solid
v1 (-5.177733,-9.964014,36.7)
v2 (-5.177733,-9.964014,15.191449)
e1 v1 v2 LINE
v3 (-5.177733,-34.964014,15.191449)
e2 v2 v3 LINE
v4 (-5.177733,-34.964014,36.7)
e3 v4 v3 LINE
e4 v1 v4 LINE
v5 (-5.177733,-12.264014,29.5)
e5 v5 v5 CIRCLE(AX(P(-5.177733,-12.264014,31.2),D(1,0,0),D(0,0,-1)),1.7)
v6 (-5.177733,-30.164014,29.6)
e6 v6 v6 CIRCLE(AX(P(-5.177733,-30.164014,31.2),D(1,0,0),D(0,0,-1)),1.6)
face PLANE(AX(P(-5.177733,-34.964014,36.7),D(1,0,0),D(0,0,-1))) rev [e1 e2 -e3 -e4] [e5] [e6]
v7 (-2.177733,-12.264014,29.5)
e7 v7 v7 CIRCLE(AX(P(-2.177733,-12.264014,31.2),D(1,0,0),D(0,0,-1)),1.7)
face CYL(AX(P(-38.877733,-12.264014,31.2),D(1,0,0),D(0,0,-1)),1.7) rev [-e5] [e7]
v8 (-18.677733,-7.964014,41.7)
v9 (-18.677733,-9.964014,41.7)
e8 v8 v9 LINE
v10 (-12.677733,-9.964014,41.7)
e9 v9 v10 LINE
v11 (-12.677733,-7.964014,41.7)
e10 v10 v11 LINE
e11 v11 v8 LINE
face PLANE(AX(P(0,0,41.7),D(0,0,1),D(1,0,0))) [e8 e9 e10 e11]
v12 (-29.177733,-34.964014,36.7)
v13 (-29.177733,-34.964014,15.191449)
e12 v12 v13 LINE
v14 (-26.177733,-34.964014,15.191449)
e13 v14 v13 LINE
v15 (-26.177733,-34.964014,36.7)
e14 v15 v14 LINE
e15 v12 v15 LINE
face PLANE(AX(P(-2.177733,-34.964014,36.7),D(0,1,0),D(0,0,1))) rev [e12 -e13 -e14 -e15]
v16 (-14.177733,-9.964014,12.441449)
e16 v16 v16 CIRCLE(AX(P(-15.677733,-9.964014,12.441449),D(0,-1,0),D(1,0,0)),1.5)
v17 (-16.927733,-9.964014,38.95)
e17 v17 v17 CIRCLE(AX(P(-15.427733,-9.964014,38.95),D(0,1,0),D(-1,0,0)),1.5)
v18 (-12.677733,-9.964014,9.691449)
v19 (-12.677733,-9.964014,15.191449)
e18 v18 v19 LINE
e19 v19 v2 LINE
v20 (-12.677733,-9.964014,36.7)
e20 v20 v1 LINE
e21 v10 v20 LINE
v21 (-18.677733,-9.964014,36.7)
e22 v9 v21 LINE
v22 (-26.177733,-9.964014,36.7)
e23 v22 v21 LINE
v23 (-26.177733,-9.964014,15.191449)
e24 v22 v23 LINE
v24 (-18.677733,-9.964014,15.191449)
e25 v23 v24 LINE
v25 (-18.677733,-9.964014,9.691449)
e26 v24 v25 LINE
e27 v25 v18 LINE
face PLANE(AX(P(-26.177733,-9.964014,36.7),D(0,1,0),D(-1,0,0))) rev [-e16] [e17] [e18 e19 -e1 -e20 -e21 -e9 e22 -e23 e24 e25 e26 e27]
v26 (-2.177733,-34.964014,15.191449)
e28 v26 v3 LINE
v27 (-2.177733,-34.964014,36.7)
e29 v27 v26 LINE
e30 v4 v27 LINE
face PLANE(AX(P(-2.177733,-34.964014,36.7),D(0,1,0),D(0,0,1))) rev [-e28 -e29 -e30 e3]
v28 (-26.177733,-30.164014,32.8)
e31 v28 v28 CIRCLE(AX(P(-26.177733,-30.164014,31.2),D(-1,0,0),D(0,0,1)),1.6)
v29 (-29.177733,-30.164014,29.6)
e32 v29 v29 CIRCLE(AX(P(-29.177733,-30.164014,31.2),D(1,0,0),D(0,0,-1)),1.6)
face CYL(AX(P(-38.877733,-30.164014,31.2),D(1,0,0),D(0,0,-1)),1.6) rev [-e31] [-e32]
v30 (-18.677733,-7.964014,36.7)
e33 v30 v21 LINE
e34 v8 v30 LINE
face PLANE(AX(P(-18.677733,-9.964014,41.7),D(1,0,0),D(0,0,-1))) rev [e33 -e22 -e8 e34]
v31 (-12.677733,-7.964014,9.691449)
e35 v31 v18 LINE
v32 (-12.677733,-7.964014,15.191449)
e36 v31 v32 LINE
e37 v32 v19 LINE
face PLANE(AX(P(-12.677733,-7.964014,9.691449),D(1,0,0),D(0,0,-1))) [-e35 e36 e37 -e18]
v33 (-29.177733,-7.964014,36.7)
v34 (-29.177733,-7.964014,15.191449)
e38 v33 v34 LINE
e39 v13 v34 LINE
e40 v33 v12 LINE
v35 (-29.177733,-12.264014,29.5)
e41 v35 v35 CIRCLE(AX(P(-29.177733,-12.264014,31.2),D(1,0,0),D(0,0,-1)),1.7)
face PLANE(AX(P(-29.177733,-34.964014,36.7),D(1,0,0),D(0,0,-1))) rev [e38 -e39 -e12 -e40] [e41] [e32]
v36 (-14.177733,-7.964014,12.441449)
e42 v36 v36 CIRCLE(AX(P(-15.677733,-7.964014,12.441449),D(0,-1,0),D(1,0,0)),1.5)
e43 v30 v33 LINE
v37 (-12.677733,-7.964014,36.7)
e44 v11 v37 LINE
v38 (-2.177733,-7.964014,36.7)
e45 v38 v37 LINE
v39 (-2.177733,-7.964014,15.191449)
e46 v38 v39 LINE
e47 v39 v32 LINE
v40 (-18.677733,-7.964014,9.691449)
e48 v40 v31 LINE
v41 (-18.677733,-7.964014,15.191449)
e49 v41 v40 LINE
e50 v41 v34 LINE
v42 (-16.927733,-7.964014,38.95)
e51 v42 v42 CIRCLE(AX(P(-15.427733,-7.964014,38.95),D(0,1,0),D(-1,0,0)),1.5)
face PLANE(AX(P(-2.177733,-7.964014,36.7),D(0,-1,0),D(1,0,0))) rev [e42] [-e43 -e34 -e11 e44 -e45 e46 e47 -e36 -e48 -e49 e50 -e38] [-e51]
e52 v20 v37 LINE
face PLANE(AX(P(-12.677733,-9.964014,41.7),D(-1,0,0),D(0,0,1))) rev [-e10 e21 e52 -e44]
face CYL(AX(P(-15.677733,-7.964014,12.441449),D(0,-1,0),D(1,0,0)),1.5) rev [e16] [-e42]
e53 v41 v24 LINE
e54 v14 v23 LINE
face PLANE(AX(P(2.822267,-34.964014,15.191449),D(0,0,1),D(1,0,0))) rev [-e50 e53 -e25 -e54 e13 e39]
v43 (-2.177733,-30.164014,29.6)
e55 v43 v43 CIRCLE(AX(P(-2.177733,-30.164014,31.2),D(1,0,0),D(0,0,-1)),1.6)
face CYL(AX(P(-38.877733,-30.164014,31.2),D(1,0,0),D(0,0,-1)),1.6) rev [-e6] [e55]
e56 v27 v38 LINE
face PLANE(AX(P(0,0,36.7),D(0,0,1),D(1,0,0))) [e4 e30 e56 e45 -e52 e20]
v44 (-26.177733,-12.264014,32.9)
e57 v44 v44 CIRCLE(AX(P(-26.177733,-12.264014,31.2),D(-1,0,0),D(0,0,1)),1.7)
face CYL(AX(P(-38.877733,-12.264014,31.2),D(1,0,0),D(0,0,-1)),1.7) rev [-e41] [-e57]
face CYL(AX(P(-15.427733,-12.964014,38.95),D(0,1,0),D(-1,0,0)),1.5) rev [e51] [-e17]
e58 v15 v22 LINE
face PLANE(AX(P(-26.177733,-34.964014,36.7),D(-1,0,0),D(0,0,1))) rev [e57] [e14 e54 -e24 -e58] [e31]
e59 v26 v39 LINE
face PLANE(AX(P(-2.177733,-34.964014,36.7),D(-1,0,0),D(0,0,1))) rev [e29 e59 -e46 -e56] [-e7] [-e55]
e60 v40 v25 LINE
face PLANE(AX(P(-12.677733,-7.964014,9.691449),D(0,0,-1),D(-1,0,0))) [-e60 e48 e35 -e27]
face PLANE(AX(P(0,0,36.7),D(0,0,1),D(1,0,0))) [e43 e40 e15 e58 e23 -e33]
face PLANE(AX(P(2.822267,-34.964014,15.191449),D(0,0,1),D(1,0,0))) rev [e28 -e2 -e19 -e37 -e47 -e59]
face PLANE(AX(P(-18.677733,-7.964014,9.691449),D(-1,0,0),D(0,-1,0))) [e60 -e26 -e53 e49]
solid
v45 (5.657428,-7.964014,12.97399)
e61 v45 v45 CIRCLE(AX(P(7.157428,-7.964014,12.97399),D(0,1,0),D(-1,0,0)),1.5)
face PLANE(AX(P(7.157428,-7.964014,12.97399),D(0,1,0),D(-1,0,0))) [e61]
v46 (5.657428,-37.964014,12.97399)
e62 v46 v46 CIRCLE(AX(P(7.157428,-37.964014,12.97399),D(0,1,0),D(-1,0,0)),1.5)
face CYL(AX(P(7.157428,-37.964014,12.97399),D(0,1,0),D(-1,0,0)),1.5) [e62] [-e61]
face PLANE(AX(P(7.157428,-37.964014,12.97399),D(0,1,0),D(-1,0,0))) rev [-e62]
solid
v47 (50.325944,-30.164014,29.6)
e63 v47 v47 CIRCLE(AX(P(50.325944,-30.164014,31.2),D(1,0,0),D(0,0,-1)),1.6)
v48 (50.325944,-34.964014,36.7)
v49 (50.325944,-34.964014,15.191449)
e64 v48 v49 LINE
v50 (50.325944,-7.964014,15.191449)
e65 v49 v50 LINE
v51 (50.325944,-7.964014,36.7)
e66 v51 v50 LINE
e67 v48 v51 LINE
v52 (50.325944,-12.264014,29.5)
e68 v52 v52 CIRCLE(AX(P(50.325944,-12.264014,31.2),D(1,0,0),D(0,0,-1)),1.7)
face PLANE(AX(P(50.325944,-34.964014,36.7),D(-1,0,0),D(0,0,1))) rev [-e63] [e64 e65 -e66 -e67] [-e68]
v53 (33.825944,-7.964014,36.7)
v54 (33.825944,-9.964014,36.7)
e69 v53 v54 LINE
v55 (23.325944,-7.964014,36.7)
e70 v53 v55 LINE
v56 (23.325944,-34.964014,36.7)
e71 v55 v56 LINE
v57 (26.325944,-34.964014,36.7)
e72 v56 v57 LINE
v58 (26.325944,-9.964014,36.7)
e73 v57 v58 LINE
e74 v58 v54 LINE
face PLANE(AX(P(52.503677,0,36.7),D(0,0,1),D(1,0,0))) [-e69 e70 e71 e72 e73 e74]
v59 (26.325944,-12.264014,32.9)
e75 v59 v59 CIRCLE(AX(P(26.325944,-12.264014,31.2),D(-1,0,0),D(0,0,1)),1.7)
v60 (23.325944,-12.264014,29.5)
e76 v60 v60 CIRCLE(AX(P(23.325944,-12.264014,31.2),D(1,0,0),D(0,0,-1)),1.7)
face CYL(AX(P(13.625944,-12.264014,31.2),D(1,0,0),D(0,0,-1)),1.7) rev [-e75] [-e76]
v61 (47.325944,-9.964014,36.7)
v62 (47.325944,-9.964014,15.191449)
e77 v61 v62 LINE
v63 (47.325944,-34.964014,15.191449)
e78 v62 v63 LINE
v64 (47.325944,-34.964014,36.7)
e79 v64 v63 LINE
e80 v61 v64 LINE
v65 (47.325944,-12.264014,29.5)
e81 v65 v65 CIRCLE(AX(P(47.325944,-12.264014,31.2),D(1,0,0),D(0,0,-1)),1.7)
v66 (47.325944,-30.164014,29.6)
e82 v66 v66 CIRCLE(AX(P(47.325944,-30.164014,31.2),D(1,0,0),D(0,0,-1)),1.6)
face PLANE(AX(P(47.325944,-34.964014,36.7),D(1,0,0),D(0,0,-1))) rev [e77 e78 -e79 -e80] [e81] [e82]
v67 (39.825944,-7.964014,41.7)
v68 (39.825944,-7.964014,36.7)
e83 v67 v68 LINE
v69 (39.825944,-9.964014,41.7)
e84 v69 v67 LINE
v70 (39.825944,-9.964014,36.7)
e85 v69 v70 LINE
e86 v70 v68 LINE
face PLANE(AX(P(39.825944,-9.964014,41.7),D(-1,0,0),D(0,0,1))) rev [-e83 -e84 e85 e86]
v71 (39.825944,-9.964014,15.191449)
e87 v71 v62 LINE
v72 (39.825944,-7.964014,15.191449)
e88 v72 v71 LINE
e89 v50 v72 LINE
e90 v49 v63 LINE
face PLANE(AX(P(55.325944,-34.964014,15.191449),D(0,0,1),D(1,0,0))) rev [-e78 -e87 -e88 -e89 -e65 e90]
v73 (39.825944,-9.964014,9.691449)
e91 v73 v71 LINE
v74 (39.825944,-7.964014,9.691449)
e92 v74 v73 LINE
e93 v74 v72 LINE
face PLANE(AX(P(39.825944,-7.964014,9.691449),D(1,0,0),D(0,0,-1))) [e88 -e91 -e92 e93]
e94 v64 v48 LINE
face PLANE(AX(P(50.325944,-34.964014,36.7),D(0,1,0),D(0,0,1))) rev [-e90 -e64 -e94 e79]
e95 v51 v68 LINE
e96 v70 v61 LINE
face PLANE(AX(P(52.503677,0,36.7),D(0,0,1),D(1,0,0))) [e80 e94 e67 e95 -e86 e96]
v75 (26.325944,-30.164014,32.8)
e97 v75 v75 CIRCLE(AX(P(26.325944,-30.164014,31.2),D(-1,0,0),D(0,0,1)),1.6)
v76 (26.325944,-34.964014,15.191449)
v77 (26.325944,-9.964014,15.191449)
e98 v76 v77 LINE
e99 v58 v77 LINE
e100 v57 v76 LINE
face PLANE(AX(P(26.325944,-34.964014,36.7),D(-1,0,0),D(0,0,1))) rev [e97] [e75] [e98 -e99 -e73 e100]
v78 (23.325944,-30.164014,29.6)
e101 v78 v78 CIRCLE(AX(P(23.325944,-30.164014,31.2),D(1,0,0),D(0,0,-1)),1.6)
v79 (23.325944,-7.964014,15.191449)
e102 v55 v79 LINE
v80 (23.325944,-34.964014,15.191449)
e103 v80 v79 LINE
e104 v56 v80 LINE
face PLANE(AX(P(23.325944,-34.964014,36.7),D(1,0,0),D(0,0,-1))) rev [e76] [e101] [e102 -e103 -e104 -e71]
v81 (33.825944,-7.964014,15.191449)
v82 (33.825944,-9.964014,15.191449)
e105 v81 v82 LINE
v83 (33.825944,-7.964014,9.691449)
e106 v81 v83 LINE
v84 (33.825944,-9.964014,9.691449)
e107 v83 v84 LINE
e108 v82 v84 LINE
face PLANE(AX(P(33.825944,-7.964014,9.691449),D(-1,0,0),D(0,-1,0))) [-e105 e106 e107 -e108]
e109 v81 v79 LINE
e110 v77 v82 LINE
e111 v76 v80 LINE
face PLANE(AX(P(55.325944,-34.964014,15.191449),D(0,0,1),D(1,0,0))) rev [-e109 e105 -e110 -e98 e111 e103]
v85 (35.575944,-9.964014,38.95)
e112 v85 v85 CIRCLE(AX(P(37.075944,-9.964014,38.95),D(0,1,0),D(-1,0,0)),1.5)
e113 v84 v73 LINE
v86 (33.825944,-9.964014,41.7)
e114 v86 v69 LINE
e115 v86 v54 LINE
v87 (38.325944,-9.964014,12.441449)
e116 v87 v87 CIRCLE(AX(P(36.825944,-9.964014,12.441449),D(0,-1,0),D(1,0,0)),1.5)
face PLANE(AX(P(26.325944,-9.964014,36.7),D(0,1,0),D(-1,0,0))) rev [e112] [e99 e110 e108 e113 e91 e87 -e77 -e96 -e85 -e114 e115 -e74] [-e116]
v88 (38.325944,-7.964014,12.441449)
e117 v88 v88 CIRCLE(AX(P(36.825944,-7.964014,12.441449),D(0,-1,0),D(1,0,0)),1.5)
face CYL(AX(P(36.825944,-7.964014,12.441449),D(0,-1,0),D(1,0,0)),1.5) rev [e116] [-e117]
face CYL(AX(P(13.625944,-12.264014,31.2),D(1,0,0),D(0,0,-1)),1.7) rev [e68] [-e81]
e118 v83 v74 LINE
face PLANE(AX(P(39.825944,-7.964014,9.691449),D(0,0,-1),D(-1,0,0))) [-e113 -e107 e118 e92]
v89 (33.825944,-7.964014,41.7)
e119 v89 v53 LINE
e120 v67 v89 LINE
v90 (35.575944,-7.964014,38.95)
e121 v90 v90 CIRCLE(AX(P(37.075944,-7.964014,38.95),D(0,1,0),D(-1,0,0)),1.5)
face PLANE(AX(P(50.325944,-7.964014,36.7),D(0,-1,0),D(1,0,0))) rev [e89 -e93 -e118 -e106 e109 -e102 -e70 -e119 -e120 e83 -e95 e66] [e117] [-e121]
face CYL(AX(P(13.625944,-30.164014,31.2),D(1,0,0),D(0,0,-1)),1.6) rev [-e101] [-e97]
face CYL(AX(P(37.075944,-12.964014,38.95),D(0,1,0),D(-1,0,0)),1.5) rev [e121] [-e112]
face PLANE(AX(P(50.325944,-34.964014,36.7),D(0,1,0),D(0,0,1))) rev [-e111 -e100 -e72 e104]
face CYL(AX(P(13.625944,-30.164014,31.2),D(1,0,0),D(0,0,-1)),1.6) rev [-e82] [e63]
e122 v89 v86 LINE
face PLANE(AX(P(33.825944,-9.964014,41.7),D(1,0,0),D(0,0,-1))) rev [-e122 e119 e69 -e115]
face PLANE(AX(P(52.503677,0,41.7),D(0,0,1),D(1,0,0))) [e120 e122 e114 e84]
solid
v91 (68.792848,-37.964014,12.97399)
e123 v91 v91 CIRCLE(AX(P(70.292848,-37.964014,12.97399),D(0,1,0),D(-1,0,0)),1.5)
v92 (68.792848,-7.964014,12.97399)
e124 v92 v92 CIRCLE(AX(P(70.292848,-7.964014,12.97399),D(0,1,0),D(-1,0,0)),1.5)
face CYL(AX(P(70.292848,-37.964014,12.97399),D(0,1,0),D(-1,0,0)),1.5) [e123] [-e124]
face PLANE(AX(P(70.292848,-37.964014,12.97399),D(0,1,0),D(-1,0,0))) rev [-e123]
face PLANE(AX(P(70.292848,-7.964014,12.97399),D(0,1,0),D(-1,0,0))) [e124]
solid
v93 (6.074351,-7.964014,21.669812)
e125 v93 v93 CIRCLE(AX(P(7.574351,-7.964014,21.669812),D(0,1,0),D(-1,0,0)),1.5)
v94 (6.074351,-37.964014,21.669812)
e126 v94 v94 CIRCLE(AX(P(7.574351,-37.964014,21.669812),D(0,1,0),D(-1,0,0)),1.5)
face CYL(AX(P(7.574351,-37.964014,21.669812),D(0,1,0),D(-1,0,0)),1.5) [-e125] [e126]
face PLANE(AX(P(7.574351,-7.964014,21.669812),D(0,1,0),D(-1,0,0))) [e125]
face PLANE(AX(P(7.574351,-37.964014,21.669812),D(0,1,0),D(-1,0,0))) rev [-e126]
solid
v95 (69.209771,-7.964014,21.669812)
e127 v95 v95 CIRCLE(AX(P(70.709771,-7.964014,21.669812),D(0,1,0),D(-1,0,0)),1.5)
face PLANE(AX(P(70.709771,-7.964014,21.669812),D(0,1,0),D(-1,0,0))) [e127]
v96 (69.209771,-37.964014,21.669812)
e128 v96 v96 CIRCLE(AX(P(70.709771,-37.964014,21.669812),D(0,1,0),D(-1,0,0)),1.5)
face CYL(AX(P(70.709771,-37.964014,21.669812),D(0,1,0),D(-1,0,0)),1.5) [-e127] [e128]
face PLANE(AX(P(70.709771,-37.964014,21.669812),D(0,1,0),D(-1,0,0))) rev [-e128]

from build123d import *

# Parameters (mm, degrees)
SKETCH1_W                 = 27
SKETCH1_H                 = 27
BOSS_EXTRUDE1_DEPTH       = 36.7
SKETCH2_W                 = 21
SKETCH2_H                 = 25
CUT_EXTRUDE1_DEPTH        = 36.7
SKETCH3_R                 = 1.7
SKETCH3_R_2               = 1.6
CUT_EXTRUDE2_DEPTH        = 36.7
SKETCH4_R                 = 3
CUT_EXTRUDE3_DEPTH        = 36.7
SKETCH8_R                 = 1.5
BOSS_EXTRUDE3_DEPTH       = 30
BOSS_EXTRUDE3_2_DEPTH     = 30
SKETCH9_W                 = 5.918746276
SKETCH9_H                 = 6
SKETCH9_W_2               = 6.707912446
CUT_EXTRUDE4_DEPTH        = 12
SKETCH11_W                = 15.191448775
SKETCH11_H                = 37.067540439
CUT_EXTRUDE6_DEPTH        = 32
SKETCH15_W                = 6
SKETCH15_H                = 12.008551225
SKETCH15_R                = 1.5
BOSS_EXTRUDE5_DEPTH       = 2.5
SKETCH17_W                = 99.088440485
SKETCH17_H                = 65.829588933
CUT_EXTRUDE9_DEPTH        = 50
SKETCH18_W                = 6
SKETCH18_H                = 2
BOSS_EXTRUDE6_DEPTH       = 5
SKETCH19_R                = 1.5
CUT_EXTRUDE10_DEPTH       = 5
SKETCH20_W                = 6
SKETCH20_H                = 5.5
SKETCH20_R                = 1.5
BOSS_EXTRUDE7_DEPTH       = 2
BODY_MOVE_COPY8_START     = -37.96401366
BODY_MOVE_COPY8_OUTLINE_R = 1.5
BODY_MOVE_COPY8_DEPTH     = 30


# Read off the part's stored shape, not the designer's step: Body-Move/Copy8
with BuildPart() as part:
    # Sketch1 → Boss-Extrude1 (new body)
    with BuildSketch(Plane.XY):
        with Locations((-15.677732696, -21.46401366)):
            Rectangle(SKETCH1_W, SKETCH1_H)
    extrude(amount=BOSS_EXTRUDE1_DEPTH)

    # Sketch2 → Cut-Extrude1 (cut)
    with BuildSketch(Plane(origin=(0, 0, 0), x_dir=(-1, 0, 0), z_dir=(0, 0, -1))):
        with Locations((15.677732696, -22.46401366)):
            Rectangle(SKETCH2_W, SKETCH2_H)
    extrude(amount=-CUT_EXTRUDE1_DEPTH, mode=Mode.SUBTRACT)

    # Sketch3 → Cut-Extrude2 (cut)
    with BuildSketch(Plane(origin=(-2.177732696, 0, 0), x_dir=(0, 0, -1), z_dir=(1, 0, 0))):
        with Locations((-31.2, -12.26401366)):
            Circle(SKETCH3_R)
        with Locations((-31.2, -30.16401366)):
            Circle(SKETCH3_R_2)
    extrude(amount=-CUT_EXTRUDE2_DEPTH, mode=Mode.SUBTRACT)

    # Sketch4 → Cut-Extrude3 (cut)
    with BuildSketch(Plane(origin=(-2.177732696, 0, 0), x_dir=(0, 0, -1), z_dir=(1, 0, 0))):
        with Locations((-12.025092395, -21.16401366)):
            Circle(SKETCH4_R)
    extrude(amount=-CUT_EXTRUDE3_DEPTH, mode=Mode.SUBTRACT)

    # Sketch9 → Cut-Extrude4 (cut)
    with BuildSketch(Plane(origin=(0, 0, 0), x_dir=(-1, 0, 0), z_dir=(0, 0, -1))):
        with Locations((3.689038825, -21.16401366)):
            Rectangle(SKETCH9_W, SKETCH9_H)
        with Locations((28.103867214, -21.16401366)):
            Rectangle(SKETCH9_W_2, SKETCH9_H)
    extrude(amount=-CUT_EXTRUDE4_DEPTH, mode=Mode.SUBTRACT)

    # Sketch11 → Cut-Extrude6 (cut)
    with BuildSketch(Plane.ZY.offset(29.177732696)):
        with Locations((7.595724388, -16.43024344)):
            Rectangle(SKETCH11_W, SKETCH11_H)
    extrude(amount=-CUT_EXTRUDE6_DEPTH, mode=Mode.SUBTRACT)


with BuildPart() as body_2:
    # Sketch8 → Boss-Extrude3 (new body)
    with BuildSketch(Plane(origin=(0, -7.96401366, 0), x_dir=(1, 0, 0), z_dir=(0, 1, 0))):
        with Locations(Location((7.15742756, -12.973989901, 0), (0, 0, 180))):
            Circle(SKETCH8_R)
    extrude(amount=-BOSS_EXTRUDE3_DEPTH)


with BuildPart() as body_3:
    # Sketch8 → Boss-Extrude3 2 (new body)
    with BuildSketch(Plane(origin=(0, -7.96401366, 0), x_dir=(1, 0, 0), z_dir=(0, 1, 0))):
        with Locations(Location((7.574350551, -21.669812293, 0), (0, 0, 180))):
            Circle(SKETCH8_R)
    extrude(amount=-BOSS_EXTRUDE3_2_DEPTH)


with BuildPart() as body_4:
    # Body-Move/Copy4: copy of part
    add(part.part.moved(Location((-70.821628829, 0, 0))))

    # Sketch15 → Boss-Extrude5 (add)
    with BuildSketch(Plane(origin=(0, -7.96401366, 0), x_dir=(1, 0, 0), z_dir=(0, 1, 0))):
        with Locations((-69.999361524, -25.945724388)):
            Rectangle(SKETCH15_W, SKETCH15_H)
        with Locations(Location((-69.999361524, -22.941448775, 0), (0, 0, 180))):
            Circle(SKETCH15_R, mode=Mode.SUBTRACT)
        with Locations(Location((-69.999361524, -28.95, 0), (0, 0, 180))):
            Circle(SKETCH15_R, mode=Mode.SUBTRACT)
    extrude(amount=-BOSS_EXTRUDE5_DEPTH)


with BuildPart() as body_5:
    # Body-Move/Copy5: copy of body 2
    add(body_2.part.moved(Location((-69.754488263, 0, 0))))


with BuildPart() as body_6:
    # Body-Move/Copy6: copy of body 3
    add(body_3.part.moved(Location((-71.521118541, 0, 0))))


with BuildPart() as cut_extrude9_tool:
    # Sketch17 → Cut-Extrude9 (new body)
    with BuildSketch(Plane(origin=(0, -7.96401366, 0), x_dir=(1, 0, 0), z_dir=(0, 1, 0))):
        with Locations((-104.540526015, -10.422992559)):
            Rectangle(SKETCH17_W, SKETCH17_H)
    extrude(amount=-CUT_EXTRUDE9_DEPTH)


with BuildPart() as body_4_1:
    add(body_4.part)

    # Cut-Extrude9: cut by cut_extrude9_tool
    add(cut_extrude9_tool.part, mode=Mode.SUBTRACT)


with BuildPart() as body_5_1:
    add(body_5.part)

    # Cut-Extrude9: cut by cut_extrude9_tool
    add(cut_extrude9_tool.part, mode=Mode.SUBTRACT)


with BuildPart() as body_6_1:
    add(body_6.part)

    # Cut-Extrude9: cut by cut_extrude9_tool
    add(cut_extrude9_tool.part, mode=Mode.SUBTRACT)


with BuildPart() as part_1:
    add(part.part)

    # Sketch18 → Boss-Extrude6 (add)
    with BuildSketch(Plane.XY.offset(36.7)):
        with Locations((-15.677732696, -8.96401366)):
            Rectangle(SKETCH18_W, SKETCH18_H)
    extrude(amount=BOSS_EXTRUDE6_DEPTH)

    # Sketch19 → Cut-Extrude10 (cut)
    with BuildSketch(Plane(origin=(0, -7.96401366, 0), x_dir=(1, 0, 0), z_dir=(0, 1, 0))):
        with Locations(Location((-15.427732696, -38.95, 0), (0, 0, 180))):
            Circle(SKETCH19_R)
    extrude(amount=-CUT_EXTRUDE10_DEPTH, mode=Mode.SUBTRACT)

    # Sketch20 → Boss-Extrude7 (add)
    with BuildSketch(Plane.XZ.offset(9.96401366)):
        with Locations((-15.677732696, 12.441448775)):
            Rectangle(SKETCH20_W, SKETCH20_H)
        with Locations((-15.677732696, 12.441448775)):
            Circle(SKETCH20_R, mode=Mode.SUBTRACT)
    extrude(amount=-BOSS_EXTRUDE7_DEPTH)


with BuildPart() as body_4_2:
    # Body-Move/Copy7: copy of part
    add(part_1.part.moved(Location((52.503676829, 0, 0))))


with BuildPart() as body_5_2:
    # Body-Move/Copy8 outline → Body-Move/Copy8 (new body)
    with BuildSketch(Plane(origin=(0, 0, 0), x_dir=(1, 0, 0), z_dir=(0, 1, 0)).offset(BODY_MOVE_COPY8_START)):
        with Locations((70.709770924, -21.669812293)):
            Circle(BODY_MOVE_COPY8_OUTLINE_R)
        with Locations((70.292847932, -12.973989901)):
            Circle(BODY_MOVE_COPY8_OUTLINE_R)
    extrude(amount=BODY_MOVE_COPY8_DEPTH)


solid = Compound([body_2.part, body_3.part, part_1.part, body_4_2.part, body_5_2.part])
